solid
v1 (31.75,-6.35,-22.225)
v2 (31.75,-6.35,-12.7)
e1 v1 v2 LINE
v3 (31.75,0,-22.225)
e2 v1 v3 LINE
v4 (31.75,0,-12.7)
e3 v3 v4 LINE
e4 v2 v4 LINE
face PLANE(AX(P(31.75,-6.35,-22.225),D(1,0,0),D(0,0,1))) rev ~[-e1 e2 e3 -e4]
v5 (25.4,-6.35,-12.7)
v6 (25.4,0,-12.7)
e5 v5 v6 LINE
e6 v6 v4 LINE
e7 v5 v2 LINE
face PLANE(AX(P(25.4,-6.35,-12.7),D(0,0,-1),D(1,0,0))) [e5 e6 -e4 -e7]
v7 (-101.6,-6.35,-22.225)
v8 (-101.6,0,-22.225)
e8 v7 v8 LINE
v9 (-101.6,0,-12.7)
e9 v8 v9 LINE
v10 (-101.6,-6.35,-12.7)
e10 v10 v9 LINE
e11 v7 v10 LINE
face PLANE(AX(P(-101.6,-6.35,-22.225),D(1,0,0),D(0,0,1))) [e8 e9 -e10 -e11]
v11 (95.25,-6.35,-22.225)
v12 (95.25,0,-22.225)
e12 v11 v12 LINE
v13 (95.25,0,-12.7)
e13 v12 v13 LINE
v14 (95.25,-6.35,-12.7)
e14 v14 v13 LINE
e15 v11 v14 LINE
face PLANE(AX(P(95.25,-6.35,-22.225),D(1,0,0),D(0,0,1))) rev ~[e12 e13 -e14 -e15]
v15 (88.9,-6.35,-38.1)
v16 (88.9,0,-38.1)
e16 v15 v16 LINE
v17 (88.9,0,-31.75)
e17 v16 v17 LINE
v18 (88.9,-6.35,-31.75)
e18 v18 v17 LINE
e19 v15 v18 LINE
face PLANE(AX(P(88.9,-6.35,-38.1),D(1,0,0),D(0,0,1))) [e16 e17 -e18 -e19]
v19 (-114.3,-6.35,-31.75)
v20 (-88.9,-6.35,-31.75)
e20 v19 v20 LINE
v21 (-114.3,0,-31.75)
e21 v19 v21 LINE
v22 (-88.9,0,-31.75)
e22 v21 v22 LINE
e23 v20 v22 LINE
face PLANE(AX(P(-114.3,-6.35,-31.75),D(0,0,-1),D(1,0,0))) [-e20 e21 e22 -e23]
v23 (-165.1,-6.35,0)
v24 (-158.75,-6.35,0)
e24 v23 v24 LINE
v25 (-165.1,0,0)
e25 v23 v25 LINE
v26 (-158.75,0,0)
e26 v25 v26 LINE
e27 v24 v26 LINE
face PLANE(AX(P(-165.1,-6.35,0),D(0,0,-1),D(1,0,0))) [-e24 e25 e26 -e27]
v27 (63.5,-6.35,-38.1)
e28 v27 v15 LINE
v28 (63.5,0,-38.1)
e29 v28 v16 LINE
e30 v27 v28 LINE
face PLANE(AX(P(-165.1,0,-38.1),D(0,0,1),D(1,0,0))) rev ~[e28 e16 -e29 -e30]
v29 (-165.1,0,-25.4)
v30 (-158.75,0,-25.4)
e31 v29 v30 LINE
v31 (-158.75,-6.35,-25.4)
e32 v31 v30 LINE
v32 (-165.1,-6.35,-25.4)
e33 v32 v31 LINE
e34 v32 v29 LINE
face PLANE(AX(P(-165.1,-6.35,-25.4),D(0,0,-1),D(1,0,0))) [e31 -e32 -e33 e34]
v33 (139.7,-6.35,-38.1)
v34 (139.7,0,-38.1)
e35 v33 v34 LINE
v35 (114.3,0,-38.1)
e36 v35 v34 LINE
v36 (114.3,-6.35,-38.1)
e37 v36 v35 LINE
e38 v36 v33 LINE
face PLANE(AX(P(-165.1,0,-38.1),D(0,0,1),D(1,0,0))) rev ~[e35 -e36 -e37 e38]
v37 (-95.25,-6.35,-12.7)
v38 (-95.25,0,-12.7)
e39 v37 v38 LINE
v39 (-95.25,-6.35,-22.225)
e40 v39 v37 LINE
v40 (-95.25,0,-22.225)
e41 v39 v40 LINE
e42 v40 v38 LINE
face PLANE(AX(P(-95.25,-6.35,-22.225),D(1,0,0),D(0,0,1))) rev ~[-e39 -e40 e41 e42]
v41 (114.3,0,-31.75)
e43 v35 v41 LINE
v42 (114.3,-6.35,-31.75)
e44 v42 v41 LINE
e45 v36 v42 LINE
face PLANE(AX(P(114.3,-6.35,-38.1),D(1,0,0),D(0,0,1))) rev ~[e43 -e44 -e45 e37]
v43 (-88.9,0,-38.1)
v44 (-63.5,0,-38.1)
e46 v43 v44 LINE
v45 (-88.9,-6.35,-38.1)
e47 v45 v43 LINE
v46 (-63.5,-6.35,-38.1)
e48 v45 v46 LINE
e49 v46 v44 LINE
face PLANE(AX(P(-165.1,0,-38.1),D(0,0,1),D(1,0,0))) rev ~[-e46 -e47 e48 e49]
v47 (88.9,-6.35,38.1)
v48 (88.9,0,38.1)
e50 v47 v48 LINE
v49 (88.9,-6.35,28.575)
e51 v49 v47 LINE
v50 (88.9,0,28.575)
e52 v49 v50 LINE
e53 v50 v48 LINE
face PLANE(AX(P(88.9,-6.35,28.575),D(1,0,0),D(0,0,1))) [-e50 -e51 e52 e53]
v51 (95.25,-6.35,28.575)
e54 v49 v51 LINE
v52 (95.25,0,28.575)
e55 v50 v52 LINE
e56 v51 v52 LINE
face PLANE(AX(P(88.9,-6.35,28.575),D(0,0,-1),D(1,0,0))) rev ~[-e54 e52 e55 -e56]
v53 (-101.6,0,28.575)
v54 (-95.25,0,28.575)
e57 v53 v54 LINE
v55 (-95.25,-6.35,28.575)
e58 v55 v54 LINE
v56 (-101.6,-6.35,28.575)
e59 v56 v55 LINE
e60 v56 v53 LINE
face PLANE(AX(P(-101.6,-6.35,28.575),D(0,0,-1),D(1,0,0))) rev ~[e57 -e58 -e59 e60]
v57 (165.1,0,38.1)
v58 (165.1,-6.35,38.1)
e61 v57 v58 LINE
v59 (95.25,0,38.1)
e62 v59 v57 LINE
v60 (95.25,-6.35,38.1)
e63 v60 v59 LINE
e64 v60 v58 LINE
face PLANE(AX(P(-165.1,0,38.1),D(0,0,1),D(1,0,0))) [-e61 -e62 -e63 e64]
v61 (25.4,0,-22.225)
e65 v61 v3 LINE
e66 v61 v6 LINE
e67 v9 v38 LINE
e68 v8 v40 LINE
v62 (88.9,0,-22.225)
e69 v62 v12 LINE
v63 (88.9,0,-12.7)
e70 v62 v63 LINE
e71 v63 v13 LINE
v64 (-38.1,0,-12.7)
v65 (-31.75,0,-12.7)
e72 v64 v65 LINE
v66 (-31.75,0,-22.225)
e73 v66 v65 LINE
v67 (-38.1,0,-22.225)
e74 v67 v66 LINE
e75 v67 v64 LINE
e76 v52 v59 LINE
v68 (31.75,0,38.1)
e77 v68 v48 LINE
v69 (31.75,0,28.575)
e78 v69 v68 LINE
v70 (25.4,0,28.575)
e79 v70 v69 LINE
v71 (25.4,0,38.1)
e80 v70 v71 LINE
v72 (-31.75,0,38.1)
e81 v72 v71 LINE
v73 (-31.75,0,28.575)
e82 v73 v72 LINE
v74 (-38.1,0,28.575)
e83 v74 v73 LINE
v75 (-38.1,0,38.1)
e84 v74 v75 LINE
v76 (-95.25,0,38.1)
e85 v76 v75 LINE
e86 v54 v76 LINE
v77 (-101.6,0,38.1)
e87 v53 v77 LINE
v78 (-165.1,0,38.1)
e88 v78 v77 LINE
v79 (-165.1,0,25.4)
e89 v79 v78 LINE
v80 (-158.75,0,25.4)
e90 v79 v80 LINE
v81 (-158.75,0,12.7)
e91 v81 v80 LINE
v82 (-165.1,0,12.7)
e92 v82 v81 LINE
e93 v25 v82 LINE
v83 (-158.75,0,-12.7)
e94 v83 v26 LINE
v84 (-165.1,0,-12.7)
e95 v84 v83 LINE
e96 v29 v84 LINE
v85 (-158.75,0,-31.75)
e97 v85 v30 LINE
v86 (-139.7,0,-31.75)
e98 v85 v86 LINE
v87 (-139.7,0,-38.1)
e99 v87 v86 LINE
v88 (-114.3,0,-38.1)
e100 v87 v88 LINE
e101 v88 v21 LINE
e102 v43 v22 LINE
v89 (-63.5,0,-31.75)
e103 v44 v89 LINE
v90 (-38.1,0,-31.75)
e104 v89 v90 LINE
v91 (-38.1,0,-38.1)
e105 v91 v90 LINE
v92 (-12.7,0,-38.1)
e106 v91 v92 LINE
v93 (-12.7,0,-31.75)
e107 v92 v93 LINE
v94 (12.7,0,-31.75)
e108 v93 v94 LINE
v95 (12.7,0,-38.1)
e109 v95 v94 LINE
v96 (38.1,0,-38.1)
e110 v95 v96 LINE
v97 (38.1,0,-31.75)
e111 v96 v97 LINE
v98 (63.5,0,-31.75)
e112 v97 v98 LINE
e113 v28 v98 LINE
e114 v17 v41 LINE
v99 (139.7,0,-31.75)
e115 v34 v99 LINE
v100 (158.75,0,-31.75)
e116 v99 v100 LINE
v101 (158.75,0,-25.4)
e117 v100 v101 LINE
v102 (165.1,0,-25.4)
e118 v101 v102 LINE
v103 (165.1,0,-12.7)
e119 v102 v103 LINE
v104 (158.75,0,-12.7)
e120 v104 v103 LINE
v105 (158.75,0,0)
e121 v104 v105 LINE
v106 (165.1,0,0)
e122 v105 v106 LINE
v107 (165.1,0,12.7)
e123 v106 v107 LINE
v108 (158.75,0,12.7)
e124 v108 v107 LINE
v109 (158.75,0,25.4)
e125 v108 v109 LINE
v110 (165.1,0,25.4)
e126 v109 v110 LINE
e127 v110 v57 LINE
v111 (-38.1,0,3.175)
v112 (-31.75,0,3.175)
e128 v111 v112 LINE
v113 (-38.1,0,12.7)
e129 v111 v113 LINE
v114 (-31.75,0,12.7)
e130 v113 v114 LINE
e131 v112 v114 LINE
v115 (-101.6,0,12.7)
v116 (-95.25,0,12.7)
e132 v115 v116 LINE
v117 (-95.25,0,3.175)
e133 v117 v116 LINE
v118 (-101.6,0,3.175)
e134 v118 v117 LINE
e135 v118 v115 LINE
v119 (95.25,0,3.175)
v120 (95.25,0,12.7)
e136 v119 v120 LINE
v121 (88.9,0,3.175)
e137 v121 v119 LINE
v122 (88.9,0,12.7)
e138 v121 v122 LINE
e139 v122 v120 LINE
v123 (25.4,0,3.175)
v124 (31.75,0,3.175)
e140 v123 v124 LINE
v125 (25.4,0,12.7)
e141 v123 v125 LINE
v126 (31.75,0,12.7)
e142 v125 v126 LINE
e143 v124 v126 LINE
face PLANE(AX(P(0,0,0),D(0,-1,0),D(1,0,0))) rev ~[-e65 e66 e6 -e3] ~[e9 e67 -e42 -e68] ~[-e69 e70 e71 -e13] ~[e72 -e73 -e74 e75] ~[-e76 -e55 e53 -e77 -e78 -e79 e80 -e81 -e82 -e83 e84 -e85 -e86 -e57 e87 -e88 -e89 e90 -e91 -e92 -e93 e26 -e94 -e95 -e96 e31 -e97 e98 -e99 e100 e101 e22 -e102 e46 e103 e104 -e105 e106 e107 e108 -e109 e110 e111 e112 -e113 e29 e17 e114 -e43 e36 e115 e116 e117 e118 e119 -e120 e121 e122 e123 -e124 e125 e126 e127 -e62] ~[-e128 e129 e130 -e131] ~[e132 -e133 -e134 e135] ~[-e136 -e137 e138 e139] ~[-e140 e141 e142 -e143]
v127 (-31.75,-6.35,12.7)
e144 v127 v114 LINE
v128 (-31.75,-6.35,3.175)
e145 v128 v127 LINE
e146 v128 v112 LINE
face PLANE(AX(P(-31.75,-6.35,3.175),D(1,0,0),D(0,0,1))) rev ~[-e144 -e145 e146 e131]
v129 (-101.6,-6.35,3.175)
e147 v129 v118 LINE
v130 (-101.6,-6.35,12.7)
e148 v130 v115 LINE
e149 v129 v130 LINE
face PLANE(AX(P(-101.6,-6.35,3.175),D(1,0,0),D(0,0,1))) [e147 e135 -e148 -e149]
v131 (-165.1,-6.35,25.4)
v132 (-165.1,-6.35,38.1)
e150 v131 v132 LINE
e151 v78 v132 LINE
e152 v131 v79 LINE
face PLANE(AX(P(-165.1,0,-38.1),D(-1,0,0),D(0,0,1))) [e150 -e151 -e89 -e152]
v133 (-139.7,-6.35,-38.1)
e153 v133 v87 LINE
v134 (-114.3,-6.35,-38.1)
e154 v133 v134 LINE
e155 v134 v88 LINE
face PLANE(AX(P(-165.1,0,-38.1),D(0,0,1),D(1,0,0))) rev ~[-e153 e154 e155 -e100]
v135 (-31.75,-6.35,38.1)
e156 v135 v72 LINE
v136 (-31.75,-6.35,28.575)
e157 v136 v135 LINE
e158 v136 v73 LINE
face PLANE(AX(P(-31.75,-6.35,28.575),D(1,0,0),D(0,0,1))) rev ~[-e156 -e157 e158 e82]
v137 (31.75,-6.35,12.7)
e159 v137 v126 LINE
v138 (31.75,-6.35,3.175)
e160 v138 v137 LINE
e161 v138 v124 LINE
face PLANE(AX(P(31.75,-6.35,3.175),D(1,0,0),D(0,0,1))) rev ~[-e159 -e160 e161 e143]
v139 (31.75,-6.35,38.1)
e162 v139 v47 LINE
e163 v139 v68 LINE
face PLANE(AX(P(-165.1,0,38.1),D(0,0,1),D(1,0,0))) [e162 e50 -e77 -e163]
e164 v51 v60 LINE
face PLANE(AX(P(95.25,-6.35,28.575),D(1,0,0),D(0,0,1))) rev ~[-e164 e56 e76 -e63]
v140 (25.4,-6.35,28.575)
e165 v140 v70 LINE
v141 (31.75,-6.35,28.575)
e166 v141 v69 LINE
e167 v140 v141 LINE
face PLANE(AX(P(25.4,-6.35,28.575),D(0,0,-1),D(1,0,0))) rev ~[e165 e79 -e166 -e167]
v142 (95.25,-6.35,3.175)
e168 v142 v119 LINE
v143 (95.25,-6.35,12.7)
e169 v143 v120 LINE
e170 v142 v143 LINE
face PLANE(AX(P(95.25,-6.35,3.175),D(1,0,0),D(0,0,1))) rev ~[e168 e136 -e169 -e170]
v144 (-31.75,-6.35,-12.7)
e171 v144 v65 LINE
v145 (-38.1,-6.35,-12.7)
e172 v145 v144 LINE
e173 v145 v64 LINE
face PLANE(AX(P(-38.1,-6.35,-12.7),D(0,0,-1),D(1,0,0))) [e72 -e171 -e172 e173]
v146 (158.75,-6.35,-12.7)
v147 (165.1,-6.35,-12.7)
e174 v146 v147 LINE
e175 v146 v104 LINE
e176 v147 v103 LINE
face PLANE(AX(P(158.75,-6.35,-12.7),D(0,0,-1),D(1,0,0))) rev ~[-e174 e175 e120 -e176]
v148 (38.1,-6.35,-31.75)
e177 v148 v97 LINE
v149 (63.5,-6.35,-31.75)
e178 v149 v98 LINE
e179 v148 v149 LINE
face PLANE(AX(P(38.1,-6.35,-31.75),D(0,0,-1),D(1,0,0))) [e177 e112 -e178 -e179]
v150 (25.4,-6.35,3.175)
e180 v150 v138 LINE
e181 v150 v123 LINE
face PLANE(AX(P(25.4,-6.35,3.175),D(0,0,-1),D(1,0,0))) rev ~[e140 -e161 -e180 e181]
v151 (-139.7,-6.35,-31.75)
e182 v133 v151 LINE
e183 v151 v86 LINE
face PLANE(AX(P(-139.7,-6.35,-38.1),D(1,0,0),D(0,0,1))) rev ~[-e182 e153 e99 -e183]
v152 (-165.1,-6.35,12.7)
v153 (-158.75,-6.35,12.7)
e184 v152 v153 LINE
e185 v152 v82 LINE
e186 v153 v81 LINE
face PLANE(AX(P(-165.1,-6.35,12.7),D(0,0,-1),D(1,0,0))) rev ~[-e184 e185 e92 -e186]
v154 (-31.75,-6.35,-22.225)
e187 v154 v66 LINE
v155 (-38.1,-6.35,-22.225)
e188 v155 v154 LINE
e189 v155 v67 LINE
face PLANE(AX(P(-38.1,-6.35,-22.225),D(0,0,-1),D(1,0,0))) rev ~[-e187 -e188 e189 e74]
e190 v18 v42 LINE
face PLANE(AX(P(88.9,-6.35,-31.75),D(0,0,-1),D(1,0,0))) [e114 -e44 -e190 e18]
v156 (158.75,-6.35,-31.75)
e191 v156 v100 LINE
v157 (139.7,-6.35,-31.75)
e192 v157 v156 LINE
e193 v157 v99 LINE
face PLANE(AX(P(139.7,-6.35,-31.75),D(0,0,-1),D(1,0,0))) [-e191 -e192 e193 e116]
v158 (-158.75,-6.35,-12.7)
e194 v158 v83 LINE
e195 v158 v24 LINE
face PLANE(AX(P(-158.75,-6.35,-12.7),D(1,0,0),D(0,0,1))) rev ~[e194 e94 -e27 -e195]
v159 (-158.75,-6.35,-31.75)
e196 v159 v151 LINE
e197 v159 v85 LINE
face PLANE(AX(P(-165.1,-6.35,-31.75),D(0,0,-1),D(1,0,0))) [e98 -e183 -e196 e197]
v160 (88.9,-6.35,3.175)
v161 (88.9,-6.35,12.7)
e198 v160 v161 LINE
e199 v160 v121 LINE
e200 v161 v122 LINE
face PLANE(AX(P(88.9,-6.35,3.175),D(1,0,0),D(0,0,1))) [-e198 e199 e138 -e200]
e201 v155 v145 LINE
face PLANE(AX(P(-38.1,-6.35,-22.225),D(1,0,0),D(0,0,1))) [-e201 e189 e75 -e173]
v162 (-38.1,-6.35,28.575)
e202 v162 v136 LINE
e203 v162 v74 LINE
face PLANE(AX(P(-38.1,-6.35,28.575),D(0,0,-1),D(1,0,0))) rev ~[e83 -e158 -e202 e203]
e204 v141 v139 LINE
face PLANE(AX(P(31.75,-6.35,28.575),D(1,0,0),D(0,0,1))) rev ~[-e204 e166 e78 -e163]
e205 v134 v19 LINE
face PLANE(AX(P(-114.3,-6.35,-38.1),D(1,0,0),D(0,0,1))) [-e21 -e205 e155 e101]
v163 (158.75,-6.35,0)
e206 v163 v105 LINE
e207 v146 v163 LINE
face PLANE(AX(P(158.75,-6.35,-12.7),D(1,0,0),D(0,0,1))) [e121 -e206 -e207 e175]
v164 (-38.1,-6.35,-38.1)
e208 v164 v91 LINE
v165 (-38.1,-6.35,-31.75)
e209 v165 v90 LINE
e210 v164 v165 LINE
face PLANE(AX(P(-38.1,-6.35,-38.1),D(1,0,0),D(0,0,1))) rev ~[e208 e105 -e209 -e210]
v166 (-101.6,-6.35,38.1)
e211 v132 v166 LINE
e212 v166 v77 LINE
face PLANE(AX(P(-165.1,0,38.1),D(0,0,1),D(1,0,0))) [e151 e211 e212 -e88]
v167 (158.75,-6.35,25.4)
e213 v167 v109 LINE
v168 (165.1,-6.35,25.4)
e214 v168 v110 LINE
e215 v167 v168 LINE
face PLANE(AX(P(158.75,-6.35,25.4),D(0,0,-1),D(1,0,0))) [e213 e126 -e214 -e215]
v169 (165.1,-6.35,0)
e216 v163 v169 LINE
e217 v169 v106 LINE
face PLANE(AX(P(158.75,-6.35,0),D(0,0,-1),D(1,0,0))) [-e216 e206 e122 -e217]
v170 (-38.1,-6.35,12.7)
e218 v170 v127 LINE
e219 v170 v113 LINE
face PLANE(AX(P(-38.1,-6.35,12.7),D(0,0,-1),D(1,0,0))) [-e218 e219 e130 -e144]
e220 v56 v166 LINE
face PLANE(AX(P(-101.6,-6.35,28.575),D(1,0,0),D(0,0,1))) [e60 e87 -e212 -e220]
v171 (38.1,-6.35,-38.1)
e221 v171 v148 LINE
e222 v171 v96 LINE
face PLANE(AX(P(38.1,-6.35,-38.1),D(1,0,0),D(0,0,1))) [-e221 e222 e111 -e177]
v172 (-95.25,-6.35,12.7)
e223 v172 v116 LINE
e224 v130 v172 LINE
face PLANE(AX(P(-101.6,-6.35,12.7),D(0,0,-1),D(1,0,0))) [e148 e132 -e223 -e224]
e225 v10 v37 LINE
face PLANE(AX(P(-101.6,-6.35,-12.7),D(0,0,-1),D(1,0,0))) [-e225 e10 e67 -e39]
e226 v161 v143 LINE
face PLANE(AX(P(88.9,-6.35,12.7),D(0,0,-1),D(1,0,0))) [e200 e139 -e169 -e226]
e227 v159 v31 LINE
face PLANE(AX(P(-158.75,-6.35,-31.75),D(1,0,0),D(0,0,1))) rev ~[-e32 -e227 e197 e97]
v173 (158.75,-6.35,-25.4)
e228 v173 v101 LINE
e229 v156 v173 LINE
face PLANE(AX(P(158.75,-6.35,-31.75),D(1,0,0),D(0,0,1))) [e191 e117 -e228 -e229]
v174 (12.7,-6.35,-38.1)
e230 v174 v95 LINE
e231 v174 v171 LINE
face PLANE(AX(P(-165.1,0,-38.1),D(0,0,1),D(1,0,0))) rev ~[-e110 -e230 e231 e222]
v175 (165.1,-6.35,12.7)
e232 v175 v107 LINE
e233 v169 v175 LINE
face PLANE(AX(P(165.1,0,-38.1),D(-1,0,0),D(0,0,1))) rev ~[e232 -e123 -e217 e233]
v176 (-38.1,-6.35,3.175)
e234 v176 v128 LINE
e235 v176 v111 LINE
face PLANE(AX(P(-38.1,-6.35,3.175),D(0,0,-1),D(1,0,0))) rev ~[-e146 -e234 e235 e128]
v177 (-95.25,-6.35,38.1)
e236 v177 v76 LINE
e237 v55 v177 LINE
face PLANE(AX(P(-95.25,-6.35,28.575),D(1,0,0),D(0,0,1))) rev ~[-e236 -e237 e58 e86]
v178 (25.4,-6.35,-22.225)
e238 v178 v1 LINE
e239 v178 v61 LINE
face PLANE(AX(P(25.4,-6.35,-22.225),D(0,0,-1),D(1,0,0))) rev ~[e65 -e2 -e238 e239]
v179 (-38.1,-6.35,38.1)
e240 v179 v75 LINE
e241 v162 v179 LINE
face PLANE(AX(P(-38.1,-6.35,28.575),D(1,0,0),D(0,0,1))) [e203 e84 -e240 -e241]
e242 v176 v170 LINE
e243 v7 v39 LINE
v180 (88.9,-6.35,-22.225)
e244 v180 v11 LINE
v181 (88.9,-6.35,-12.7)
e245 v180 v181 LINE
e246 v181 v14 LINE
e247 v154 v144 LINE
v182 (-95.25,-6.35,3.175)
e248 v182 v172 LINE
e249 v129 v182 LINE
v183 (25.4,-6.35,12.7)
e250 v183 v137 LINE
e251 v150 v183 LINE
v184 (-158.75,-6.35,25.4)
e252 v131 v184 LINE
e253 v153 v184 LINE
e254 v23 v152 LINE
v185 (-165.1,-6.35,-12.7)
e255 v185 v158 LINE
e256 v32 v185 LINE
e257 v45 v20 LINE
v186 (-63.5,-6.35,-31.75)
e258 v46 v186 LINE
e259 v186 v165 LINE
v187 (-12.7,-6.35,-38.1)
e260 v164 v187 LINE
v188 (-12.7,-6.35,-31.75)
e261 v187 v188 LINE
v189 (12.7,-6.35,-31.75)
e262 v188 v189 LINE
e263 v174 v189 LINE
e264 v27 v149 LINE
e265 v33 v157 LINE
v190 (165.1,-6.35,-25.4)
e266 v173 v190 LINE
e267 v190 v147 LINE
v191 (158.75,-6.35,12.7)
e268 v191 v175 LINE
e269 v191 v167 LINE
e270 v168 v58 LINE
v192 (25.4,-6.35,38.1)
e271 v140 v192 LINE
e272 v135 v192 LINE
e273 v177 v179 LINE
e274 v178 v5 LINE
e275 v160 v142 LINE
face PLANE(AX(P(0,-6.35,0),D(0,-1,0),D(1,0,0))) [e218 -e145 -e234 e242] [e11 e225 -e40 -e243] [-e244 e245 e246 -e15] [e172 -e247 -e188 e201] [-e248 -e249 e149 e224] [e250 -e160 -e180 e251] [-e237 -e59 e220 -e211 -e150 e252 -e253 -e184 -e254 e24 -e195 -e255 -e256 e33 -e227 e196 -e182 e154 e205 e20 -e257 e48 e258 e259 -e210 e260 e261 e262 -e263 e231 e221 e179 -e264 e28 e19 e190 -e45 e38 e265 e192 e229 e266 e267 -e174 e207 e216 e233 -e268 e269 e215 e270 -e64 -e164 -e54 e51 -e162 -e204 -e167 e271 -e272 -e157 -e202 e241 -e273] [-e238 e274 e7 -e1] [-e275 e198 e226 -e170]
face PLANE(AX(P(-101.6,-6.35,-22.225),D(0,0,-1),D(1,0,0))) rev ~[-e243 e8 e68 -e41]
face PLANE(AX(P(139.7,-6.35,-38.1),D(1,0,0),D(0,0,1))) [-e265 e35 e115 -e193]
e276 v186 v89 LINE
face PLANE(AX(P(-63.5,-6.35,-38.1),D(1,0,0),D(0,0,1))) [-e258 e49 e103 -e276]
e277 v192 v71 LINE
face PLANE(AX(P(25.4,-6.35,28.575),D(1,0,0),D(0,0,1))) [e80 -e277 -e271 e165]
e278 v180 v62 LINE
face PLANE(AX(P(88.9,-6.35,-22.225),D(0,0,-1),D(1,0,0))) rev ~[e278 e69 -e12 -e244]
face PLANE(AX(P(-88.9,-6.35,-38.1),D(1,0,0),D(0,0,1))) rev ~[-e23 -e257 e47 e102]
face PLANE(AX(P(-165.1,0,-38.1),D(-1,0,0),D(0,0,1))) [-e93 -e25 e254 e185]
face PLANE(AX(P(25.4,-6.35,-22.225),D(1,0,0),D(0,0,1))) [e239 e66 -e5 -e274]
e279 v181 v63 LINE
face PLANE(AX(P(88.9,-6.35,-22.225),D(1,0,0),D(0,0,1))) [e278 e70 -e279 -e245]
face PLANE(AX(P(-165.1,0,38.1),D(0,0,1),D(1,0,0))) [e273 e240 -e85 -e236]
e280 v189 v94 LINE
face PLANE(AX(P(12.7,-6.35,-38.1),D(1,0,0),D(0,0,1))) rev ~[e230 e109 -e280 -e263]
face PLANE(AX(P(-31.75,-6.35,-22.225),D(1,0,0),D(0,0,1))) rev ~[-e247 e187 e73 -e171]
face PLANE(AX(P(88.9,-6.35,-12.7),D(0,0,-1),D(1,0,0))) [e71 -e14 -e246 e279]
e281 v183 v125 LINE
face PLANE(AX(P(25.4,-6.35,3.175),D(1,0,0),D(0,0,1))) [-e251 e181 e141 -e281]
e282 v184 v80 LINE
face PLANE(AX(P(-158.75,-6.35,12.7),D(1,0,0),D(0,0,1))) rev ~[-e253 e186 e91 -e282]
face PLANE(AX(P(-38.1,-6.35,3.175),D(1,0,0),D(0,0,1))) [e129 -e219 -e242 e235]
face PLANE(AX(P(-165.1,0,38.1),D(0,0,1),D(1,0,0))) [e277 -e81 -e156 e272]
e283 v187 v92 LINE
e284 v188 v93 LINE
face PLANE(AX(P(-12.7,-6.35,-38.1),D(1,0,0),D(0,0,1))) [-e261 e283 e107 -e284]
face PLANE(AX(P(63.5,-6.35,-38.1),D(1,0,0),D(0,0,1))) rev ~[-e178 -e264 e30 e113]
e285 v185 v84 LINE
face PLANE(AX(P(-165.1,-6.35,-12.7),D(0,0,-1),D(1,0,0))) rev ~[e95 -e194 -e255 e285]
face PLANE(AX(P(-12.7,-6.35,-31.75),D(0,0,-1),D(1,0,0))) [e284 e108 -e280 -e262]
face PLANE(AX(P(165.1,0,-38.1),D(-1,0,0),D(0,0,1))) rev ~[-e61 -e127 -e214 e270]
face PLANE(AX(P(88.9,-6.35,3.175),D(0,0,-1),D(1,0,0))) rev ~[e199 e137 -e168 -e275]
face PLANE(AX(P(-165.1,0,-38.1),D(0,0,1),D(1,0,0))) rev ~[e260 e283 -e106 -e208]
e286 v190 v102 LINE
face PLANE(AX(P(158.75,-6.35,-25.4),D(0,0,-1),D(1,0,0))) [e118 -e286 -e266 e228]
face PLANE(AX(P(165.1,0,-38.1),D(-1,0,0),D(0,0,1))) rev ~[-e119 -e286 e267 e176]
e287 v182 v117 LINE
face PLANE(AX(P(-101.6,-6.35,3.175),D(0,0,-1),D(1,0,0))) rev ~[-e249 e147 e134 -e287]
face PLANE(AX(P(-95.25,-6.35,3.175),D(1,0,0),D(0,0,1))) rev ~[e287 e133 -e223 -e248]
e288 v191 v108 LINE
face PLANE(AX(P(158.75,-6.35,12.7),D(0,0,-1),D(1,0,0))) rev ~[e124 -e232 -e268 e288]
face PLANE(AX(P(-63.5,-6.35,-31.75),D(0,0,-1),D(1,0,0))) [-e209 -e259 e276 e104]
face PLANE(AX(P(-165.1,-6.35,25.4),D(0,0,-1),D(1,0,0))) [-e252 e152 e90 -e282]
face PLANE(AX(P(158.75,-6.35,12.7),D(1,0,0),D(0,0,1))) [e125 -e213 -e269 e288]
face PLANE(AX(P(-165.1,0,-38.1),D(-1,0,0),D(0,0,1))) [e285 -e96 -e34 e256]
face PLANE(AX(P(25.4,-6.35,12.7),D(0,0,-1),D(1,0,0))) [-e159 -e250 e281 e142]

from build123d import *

# Parameters (mm, degrees)
F0_W     = 330.2
F0_H     = 76.2
F1_DEPTH = 6.35
F2_W     = 25.4
F2_H     = 6.35
F2_W_2   = 6.35
F2_H_2   = 12.7
F3_DEPTH = 6.35
F4_W     = 6.35
F4_H     = 9.525
F5_DEPTH = 6.35
F6_W     = 6.35
F6_H     = 6.35
F7_DEPTH = 6.35


# Not quite as in the source:
# - a feature names something its author has since deleted; it is built from what else it names


with BuildPart() as f1:
    # F0 (on Front) → F1 (new body)
    with BuildSketch(Plane.XZ):
        Rectangle(F0_W, F0_H)
    extrude(amount=F1_DEPTH)

    # F2 (on face) → F3 (cut, through all)
    with BuildSketch(Plane.XZ.offset(6.35)):
        with Locations((-152.4, -34.925)):
            Rectangle(F2_W, F2_H)
        with Locations((-101.6, -34.925)):
            Rectangle(F2_W, F2_H)
        with Locations((-50.8, -34.925)):
            Rectangle(F2_W, F2_H)
        with Locations((0, -34.925)):
            Rectangle(F2_W, F2_H)
        with Locations((50.8, -34.925)):
            Rectangle(F2_W, F2_H)
        with Locations((101.6, -34.925)):
            Rectangle(F2_W, F2_H)
        with Locations((152.4, -34.925)):
            Rectangle(F2_W, F2_H)
        with Locations((-161.925, -6.35)):
            Rectangle(F2_W_2, F2_H_2)
        with Locations((-161.925, 19.05)):
            Rectangle(F2_W_2, F2_H_2)
        with Locations((161.925, 19.05)):
            Rectangle(F2_W_2, F2_H_2)
        with Locations((161.925, -6.35)):
            Rectangle(F2_W_2, F2_H_2)
    extrude(amount=-F3_DEPTH, mode=Mode.SUBTRACT)

    # F4 (on face) → F5 (cut, through all)
    with BuildSketch(Plane.XZ.offset(6.35)):
        with Locations((-98.425, 33.3375)):
            Rectangle(F4_W, F4_H)
        with Locations((-98.425, 7.9375)):
            Rectangle(F4_W, F4_H)
        with Locations((-98.425, -17.4625)):
            Rectangle(F4_W, F4_H)
        with Locations((-34.925, 7.9375)):
            Rectangle(F4_W, F4_H)
        with Locations((-34.925, 33.3375)):
            Rectangle(F4_W, F4_H)
        with Locations((-34.925, -17.4625)):
            Rectangle(F4_W, F4_H)
        with Locations((28.575, 7.9375)):
            Rectangle(F4_W, F4_H)
        with Locations((28.575, 33.3375)):
            Rectangle(F4_W, F4_H)
        with Locations((28.575, -17.4625)):
            Rectangle(F4_W, F4_H)
        with Locations((92.075, -17.4625)):
            Rectangle(F4_W, F4_H)
        with Locations((92.075, 7.9375)):
            Rectangle(F4_W, F4_H)
        with Locations((92.075, 33.3375)):
            Rectangle(F4_W, F4_H)
    extrude(amount=-F5_DEPTH, mode=Mode.SUBTRACT)

    # F6 (on face) → F7 (cut, through all)
    with BuildSketch(Plane.XZ.offset(6.35)):
        with Locations((-161.925, -28.575)):
            Rectangle(F6_W, F6_H)
        with Locations((161.925, -28.575)):
            Rectangle(F6_W, F6_H)
    extrude(amount=-F7_DEPTH, mode=Mode.SUBTRACT)


solid = f1.part
